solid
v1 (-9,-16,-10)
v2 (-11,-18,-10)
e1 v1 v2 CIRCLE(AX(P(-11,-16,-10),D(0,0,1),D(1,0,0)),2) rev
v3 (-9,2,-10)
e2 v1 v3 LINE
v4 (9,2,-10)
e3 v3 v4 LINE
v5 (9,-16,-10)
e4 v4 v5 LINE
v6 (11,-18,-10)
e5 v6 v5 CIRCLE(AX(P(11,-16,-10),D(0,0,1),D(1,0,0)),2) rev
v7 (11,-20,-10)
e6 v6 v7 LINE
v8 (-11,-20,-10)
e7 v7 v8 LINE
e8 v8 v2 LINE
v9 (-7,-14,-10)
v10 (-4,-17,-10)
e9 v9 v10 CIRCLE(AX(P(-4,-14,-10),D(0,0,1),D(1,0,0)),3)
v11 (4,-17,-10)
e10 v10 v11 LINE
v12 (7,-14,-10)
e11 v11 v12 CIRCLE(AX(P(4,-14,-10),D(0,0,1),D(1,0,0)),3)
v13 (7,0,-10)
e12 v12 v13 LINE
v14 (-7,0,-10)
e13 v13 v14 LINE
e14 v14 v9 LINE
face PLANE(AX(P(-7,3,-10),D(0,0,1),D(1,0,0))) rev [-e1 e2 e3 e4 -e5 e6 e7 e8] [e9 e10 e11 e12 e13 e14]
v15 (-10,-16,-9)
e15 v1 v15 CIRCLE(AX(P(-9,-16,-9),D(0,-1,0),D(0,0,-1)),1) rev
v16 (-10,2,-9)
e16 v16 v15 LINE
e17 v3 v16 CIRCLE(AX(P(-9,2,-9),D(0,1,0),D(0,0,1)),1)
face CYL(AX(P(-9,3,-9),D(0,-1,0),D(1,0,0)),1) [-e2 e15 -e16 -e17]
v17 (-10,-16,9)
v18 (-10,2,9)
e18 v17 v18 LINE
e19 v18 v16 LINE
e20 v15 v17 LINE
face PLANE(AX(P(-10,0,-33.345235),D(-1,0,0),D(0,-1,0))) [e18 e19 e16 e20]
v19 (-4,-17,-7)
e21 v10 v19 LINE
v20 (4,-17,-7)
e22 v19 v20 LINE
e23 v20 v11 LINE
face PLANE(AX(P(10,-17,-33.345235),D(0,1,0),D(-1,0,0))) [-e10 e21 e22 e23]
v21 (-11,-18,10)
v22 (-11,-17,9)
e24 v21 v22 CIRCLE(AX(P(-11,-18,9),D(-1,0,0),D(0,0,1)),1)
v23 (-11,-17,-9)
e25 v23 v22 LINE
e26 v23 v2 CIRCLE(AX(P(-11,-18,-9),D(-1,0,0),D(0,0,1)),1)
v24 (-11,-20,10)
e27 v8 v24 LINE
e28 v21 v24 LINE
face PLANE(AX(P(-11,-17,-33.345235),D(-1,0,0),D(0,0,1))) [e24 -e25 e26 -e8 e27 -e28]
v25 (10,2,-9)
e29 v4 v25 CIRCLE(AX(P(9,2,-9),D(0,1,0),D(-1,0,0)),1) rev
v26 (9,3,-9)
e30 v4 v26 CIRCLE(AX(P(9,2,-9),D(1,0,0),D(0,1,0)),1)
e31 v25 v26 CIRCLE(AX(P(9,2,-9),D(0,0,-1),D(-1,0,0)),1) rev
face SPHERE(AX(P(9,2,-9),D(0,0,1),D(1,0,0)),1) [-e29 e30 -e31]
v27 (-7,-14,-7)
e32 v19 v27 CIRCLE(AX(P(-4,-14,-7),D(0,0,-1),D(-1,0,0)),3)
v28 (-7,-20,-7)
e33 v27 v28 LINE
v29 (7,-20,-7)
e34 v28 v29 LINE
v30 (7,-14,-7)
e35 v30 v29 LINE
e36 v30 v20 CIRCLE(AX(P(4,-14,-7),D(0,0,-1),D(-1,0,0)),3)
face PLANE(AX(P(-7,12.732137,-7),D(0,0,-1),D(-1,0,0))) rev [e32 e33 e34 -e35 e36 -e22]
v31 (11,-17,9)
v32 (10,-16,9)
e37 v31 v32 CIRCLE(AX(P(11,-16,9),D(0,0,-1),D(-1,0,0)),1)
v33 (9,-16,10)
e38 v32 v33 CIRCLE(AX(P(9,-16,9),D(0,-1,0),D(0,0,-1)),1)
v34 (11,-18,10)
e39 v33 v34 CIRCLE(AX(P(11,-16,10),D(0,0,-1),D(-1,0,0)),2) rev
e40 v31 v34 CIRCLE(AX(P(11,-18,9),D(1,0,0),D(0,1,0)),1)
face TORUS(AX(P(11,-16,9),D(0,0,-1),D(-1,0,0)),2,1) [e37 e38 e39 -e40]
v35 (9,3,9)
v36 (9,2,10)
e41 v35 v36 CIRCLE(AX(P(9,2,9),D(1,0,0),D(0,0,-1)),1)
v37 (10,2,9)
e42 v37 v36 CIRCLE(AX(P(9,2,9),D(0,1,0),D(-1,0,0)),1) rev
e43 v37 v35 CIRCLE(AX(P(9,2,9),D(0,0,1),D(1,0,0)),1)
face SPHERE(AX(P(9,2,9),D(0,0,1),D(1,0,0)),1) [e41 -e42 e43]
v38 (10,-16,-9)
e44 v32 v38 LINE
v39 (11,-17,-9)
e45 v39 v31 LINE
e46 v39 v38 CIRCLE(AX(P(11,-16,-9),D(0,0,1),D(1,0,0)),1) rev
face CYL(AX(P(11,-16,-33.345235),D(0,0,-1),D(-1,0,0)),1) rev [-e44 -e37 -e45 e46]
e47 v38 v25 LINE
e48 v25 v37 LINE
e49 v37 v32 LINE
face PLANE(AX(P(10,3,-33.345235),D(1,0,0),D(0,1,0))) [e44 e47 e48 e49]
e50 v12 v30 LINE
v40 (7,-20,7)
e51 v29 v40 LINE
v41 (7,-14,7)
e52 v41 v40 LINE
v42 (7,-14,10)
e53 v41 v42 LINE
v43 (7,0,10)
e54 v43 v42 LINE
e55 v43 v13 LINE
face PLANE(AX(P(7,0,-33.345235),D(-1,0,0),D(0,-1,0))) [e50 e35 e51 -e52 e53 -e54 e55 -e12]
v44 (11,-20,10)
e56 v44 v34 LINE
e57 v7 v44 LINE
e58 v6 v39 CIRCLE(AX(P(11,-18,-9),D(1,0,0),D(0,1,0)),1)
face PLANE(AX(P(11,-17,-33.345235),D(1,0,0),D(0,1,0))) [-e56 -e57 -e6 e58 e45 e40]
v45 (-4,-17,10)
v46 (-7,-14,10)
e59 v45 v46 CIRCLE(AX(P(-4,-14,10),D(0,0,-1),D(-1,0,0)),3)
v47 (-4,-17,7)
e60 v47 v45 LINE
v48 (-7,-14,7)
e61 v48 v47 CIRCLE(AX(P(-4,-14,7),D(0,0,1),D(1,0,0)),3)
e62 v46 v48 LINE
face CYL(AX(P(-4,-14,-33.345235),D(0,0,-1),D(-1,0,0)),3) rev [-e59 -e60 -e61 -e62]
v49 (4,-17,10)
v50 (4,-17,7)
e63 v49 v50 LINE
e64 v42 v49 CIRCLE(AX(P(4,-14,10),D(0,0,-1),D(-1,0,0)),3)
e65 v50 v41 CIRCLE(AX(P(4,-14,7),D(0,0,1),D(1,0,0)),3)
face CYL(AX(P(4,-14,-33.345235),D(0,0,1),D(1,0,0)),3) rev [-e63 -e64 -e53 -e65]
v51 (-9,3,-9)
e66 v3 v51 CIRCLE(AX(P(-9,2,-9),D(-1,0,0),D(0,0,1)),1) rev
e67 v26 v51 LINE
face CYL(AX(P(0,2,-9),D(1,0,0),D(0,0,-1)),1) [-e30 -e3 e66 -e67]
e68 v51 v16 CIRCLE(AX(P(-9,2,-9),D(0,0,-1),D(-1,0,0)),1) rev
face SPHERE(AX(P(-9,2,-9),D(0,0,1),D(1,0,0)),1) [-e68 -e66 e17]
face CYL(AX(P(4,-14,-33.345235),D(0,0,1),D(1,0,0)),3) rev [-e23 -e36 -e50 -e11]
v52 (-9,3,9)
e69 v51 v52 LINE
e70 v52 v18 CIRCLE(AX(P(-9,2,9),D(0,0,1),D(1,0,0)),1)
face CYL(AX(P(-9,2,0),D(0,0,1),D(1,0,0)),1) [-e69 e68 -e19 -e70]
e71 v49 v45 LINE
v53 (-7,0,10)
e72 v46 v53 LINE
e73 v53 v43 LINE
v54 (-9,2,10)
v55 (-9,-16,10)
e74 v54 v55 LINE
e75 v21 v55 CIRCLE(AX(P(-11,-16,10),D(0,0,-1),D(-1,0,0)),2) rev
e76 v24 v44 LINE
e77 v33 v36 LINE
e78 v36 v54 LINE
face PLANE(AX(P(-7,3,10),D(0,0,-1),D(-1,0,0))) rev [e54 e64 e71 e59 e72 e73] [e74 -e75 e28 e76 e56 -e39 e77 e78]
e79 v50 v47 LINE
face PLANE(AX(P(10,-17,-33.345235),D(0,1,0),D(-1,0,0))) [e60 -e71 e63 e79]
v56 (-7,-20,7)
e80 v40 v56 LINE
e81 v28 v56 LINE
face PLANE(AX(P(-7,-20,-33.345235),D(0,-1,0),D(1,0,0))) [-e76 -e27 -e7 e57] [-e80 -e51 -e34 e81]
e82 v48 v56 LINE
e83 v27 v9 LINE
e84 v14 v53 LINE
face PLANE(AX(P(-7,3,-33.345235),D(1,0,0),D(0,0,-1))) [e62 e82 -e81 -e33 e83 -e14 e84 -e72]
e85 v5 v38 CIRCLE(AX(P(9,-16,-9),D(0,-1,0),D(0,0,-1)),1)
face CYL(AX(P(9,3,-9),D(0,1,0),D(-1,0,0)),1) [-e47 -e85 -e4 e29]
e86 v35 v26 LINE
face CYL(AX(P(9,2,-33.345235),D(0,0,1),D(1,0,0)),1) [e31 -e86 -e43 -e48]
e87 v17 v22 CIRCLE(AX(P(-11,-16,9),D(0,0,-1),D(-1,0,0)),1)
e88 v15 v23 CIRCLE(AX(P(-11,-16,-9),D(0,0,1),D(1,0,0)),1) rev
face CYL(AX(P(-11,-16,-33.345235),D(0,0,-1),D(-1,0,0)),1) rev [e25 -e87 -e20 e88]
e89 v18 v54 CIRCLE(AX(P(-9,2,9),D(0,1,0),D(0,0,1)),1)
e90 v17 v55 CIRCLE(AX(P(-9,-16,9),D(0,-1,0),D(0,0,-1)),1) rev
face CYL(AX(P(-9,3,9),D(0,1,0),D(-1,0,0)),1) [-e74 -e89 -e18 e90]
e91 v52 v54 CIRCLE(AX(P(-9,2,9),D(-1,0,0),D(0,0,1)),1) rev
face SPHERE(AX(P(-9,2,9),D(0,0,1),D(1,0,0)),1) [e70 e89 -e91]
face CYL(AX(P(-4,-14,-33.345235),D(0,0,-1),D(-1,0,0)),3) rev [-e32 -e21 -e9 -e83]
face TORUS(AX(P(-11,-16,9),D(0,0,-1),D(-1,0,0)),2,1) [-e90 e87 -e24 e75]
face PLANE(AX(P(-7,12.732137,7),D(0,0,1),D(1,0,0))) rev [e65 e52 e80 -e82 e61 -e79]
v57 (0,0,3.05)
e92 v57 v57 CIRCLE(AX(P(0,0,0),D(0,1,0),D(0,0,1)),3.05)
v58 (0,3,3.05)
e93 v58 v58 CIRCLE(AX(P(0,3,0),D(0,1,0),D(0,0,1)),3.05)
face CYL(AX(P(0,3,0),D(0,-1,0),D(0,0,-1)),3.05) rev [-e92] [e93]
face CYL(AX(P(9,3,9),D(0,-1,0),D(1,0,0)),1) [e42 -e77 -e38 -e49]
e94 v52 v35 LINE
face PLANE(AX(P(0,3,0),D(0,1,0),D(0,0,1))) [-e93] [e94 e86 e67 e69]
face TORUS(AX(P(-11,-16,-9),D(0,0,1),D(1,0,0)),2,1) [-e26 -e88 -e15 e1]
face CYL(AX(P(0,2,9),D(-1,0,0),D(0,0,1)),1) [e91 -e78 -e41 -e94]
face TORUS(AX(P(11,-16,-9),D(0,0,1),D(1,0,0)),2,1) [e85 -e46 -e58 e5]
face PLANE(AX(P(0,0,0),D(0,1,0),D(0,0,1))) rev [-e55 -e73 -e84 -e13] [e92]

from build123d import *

# Parameters (mm, degrees)
SKETCH_1_W      = 14
SKETCH_1_H      = 20
SKETCH_1_R      = 3.05
EXTRUDE_1_DEPTH = 3
EXTRUDE_2_DEPTH = 20
SKETCH_4_W      = 22
SKETCH_4_H      = 20
SKETCH_4_W_2    = 14
SKETCH_4_H_2    = 14
EXTRUDE_4_DEPTH = 3
FILLET_2_R      = 1
FILLET_3_R      = 3


with BuildPart() as part:
    # 草图1 → 凸台-拉伸1 (new body)
    with BuildSketch(Plane(origin=(0, 0, 0), x_dir=(1, 0, 0), z_dir=(0, 1, 0))):
        Rectangle(SKETCH_1_W, SKETCH_1_H)
        with Locations(Location((0, 0, 0), (0, 0, 270))):
            Circle(SKETCH_1_R, mode=Mode.SUBTRACT)
    extrude(amount=EXTRUDE_1_DEPTH)

    # 草图2 → 凸台-拉伸2 (add)
    with BuildSketch(Plane.XY.offset(10)):
        Polygon((-7, 3), (-7, 0), (-7, -20), (-11, -20), (-11, -17), (-10, -17), (-10, 0), (-10, 3), align=None)
        Polygon((10, 3), (10, 0), (10, -17), (11, -17), (11, -20), (7, -20), (7, 0), (7, 3), align=None)
    extrude(amount=-EXTRUDE_2_DEPTH)

    # 草图4 → 凸台-拉伸4 (add)
    with BuildSketch(Plane.XZ.offset(20)):
        Rectangle(SKETCH_4_W, SKETCH_4_H)
        Rectangle(SKETCH_4_W_2, SKETCH_4_H_2, mode=Mode.SUBTRACT)
    extrude(amount=-EXTRUDE_4_DEPTH)

    # 圆角2
    fillet_2_edges = [part.edges().sort_by_distance(p)[0] for p in [
        (-10, -17, 0),
        (10, -17, 0),
    ]]
    fillet(fillet_2_edges, radius=FILLET_2_R - 0.0001)  # a hair under: the kernel refuses the full size
    fillet_2_2_edges = [part.edges().sort_by_distance(p)[0] for p in [
        (-10, 3, 0),
        (0, 3, -10),
        (10, 3, 0),
        (0, 3, 10),
        (-10, -6.50005, -10),
        (-10, -6.50005, 10),
        (10, -6.50005, -10),
        (10, -6.50005, 10),
        (10.292863929, -16.707136071, 10),
        (10.292863929, -16.707136071, -10),
        (-10.292863929, -16.707136071, 10),
        (-10.292863929, -16.707136071, -10),
    ]]
    fillet(fillet_2_2_edges, radius=FILLET_2_R)

    # 圆角3
    fillet_3_edges = [part.edges().sort_by_distance(p)[0] for p in [
        (7, -17, -8.5),
        (7, -17, 8.5),
        (-7, -17, -8.5),
        (-7, -17, 8.5),
    ]]
    fillet(fillet_3_edges, radius=FILLET_3_R)


solid = part.part
